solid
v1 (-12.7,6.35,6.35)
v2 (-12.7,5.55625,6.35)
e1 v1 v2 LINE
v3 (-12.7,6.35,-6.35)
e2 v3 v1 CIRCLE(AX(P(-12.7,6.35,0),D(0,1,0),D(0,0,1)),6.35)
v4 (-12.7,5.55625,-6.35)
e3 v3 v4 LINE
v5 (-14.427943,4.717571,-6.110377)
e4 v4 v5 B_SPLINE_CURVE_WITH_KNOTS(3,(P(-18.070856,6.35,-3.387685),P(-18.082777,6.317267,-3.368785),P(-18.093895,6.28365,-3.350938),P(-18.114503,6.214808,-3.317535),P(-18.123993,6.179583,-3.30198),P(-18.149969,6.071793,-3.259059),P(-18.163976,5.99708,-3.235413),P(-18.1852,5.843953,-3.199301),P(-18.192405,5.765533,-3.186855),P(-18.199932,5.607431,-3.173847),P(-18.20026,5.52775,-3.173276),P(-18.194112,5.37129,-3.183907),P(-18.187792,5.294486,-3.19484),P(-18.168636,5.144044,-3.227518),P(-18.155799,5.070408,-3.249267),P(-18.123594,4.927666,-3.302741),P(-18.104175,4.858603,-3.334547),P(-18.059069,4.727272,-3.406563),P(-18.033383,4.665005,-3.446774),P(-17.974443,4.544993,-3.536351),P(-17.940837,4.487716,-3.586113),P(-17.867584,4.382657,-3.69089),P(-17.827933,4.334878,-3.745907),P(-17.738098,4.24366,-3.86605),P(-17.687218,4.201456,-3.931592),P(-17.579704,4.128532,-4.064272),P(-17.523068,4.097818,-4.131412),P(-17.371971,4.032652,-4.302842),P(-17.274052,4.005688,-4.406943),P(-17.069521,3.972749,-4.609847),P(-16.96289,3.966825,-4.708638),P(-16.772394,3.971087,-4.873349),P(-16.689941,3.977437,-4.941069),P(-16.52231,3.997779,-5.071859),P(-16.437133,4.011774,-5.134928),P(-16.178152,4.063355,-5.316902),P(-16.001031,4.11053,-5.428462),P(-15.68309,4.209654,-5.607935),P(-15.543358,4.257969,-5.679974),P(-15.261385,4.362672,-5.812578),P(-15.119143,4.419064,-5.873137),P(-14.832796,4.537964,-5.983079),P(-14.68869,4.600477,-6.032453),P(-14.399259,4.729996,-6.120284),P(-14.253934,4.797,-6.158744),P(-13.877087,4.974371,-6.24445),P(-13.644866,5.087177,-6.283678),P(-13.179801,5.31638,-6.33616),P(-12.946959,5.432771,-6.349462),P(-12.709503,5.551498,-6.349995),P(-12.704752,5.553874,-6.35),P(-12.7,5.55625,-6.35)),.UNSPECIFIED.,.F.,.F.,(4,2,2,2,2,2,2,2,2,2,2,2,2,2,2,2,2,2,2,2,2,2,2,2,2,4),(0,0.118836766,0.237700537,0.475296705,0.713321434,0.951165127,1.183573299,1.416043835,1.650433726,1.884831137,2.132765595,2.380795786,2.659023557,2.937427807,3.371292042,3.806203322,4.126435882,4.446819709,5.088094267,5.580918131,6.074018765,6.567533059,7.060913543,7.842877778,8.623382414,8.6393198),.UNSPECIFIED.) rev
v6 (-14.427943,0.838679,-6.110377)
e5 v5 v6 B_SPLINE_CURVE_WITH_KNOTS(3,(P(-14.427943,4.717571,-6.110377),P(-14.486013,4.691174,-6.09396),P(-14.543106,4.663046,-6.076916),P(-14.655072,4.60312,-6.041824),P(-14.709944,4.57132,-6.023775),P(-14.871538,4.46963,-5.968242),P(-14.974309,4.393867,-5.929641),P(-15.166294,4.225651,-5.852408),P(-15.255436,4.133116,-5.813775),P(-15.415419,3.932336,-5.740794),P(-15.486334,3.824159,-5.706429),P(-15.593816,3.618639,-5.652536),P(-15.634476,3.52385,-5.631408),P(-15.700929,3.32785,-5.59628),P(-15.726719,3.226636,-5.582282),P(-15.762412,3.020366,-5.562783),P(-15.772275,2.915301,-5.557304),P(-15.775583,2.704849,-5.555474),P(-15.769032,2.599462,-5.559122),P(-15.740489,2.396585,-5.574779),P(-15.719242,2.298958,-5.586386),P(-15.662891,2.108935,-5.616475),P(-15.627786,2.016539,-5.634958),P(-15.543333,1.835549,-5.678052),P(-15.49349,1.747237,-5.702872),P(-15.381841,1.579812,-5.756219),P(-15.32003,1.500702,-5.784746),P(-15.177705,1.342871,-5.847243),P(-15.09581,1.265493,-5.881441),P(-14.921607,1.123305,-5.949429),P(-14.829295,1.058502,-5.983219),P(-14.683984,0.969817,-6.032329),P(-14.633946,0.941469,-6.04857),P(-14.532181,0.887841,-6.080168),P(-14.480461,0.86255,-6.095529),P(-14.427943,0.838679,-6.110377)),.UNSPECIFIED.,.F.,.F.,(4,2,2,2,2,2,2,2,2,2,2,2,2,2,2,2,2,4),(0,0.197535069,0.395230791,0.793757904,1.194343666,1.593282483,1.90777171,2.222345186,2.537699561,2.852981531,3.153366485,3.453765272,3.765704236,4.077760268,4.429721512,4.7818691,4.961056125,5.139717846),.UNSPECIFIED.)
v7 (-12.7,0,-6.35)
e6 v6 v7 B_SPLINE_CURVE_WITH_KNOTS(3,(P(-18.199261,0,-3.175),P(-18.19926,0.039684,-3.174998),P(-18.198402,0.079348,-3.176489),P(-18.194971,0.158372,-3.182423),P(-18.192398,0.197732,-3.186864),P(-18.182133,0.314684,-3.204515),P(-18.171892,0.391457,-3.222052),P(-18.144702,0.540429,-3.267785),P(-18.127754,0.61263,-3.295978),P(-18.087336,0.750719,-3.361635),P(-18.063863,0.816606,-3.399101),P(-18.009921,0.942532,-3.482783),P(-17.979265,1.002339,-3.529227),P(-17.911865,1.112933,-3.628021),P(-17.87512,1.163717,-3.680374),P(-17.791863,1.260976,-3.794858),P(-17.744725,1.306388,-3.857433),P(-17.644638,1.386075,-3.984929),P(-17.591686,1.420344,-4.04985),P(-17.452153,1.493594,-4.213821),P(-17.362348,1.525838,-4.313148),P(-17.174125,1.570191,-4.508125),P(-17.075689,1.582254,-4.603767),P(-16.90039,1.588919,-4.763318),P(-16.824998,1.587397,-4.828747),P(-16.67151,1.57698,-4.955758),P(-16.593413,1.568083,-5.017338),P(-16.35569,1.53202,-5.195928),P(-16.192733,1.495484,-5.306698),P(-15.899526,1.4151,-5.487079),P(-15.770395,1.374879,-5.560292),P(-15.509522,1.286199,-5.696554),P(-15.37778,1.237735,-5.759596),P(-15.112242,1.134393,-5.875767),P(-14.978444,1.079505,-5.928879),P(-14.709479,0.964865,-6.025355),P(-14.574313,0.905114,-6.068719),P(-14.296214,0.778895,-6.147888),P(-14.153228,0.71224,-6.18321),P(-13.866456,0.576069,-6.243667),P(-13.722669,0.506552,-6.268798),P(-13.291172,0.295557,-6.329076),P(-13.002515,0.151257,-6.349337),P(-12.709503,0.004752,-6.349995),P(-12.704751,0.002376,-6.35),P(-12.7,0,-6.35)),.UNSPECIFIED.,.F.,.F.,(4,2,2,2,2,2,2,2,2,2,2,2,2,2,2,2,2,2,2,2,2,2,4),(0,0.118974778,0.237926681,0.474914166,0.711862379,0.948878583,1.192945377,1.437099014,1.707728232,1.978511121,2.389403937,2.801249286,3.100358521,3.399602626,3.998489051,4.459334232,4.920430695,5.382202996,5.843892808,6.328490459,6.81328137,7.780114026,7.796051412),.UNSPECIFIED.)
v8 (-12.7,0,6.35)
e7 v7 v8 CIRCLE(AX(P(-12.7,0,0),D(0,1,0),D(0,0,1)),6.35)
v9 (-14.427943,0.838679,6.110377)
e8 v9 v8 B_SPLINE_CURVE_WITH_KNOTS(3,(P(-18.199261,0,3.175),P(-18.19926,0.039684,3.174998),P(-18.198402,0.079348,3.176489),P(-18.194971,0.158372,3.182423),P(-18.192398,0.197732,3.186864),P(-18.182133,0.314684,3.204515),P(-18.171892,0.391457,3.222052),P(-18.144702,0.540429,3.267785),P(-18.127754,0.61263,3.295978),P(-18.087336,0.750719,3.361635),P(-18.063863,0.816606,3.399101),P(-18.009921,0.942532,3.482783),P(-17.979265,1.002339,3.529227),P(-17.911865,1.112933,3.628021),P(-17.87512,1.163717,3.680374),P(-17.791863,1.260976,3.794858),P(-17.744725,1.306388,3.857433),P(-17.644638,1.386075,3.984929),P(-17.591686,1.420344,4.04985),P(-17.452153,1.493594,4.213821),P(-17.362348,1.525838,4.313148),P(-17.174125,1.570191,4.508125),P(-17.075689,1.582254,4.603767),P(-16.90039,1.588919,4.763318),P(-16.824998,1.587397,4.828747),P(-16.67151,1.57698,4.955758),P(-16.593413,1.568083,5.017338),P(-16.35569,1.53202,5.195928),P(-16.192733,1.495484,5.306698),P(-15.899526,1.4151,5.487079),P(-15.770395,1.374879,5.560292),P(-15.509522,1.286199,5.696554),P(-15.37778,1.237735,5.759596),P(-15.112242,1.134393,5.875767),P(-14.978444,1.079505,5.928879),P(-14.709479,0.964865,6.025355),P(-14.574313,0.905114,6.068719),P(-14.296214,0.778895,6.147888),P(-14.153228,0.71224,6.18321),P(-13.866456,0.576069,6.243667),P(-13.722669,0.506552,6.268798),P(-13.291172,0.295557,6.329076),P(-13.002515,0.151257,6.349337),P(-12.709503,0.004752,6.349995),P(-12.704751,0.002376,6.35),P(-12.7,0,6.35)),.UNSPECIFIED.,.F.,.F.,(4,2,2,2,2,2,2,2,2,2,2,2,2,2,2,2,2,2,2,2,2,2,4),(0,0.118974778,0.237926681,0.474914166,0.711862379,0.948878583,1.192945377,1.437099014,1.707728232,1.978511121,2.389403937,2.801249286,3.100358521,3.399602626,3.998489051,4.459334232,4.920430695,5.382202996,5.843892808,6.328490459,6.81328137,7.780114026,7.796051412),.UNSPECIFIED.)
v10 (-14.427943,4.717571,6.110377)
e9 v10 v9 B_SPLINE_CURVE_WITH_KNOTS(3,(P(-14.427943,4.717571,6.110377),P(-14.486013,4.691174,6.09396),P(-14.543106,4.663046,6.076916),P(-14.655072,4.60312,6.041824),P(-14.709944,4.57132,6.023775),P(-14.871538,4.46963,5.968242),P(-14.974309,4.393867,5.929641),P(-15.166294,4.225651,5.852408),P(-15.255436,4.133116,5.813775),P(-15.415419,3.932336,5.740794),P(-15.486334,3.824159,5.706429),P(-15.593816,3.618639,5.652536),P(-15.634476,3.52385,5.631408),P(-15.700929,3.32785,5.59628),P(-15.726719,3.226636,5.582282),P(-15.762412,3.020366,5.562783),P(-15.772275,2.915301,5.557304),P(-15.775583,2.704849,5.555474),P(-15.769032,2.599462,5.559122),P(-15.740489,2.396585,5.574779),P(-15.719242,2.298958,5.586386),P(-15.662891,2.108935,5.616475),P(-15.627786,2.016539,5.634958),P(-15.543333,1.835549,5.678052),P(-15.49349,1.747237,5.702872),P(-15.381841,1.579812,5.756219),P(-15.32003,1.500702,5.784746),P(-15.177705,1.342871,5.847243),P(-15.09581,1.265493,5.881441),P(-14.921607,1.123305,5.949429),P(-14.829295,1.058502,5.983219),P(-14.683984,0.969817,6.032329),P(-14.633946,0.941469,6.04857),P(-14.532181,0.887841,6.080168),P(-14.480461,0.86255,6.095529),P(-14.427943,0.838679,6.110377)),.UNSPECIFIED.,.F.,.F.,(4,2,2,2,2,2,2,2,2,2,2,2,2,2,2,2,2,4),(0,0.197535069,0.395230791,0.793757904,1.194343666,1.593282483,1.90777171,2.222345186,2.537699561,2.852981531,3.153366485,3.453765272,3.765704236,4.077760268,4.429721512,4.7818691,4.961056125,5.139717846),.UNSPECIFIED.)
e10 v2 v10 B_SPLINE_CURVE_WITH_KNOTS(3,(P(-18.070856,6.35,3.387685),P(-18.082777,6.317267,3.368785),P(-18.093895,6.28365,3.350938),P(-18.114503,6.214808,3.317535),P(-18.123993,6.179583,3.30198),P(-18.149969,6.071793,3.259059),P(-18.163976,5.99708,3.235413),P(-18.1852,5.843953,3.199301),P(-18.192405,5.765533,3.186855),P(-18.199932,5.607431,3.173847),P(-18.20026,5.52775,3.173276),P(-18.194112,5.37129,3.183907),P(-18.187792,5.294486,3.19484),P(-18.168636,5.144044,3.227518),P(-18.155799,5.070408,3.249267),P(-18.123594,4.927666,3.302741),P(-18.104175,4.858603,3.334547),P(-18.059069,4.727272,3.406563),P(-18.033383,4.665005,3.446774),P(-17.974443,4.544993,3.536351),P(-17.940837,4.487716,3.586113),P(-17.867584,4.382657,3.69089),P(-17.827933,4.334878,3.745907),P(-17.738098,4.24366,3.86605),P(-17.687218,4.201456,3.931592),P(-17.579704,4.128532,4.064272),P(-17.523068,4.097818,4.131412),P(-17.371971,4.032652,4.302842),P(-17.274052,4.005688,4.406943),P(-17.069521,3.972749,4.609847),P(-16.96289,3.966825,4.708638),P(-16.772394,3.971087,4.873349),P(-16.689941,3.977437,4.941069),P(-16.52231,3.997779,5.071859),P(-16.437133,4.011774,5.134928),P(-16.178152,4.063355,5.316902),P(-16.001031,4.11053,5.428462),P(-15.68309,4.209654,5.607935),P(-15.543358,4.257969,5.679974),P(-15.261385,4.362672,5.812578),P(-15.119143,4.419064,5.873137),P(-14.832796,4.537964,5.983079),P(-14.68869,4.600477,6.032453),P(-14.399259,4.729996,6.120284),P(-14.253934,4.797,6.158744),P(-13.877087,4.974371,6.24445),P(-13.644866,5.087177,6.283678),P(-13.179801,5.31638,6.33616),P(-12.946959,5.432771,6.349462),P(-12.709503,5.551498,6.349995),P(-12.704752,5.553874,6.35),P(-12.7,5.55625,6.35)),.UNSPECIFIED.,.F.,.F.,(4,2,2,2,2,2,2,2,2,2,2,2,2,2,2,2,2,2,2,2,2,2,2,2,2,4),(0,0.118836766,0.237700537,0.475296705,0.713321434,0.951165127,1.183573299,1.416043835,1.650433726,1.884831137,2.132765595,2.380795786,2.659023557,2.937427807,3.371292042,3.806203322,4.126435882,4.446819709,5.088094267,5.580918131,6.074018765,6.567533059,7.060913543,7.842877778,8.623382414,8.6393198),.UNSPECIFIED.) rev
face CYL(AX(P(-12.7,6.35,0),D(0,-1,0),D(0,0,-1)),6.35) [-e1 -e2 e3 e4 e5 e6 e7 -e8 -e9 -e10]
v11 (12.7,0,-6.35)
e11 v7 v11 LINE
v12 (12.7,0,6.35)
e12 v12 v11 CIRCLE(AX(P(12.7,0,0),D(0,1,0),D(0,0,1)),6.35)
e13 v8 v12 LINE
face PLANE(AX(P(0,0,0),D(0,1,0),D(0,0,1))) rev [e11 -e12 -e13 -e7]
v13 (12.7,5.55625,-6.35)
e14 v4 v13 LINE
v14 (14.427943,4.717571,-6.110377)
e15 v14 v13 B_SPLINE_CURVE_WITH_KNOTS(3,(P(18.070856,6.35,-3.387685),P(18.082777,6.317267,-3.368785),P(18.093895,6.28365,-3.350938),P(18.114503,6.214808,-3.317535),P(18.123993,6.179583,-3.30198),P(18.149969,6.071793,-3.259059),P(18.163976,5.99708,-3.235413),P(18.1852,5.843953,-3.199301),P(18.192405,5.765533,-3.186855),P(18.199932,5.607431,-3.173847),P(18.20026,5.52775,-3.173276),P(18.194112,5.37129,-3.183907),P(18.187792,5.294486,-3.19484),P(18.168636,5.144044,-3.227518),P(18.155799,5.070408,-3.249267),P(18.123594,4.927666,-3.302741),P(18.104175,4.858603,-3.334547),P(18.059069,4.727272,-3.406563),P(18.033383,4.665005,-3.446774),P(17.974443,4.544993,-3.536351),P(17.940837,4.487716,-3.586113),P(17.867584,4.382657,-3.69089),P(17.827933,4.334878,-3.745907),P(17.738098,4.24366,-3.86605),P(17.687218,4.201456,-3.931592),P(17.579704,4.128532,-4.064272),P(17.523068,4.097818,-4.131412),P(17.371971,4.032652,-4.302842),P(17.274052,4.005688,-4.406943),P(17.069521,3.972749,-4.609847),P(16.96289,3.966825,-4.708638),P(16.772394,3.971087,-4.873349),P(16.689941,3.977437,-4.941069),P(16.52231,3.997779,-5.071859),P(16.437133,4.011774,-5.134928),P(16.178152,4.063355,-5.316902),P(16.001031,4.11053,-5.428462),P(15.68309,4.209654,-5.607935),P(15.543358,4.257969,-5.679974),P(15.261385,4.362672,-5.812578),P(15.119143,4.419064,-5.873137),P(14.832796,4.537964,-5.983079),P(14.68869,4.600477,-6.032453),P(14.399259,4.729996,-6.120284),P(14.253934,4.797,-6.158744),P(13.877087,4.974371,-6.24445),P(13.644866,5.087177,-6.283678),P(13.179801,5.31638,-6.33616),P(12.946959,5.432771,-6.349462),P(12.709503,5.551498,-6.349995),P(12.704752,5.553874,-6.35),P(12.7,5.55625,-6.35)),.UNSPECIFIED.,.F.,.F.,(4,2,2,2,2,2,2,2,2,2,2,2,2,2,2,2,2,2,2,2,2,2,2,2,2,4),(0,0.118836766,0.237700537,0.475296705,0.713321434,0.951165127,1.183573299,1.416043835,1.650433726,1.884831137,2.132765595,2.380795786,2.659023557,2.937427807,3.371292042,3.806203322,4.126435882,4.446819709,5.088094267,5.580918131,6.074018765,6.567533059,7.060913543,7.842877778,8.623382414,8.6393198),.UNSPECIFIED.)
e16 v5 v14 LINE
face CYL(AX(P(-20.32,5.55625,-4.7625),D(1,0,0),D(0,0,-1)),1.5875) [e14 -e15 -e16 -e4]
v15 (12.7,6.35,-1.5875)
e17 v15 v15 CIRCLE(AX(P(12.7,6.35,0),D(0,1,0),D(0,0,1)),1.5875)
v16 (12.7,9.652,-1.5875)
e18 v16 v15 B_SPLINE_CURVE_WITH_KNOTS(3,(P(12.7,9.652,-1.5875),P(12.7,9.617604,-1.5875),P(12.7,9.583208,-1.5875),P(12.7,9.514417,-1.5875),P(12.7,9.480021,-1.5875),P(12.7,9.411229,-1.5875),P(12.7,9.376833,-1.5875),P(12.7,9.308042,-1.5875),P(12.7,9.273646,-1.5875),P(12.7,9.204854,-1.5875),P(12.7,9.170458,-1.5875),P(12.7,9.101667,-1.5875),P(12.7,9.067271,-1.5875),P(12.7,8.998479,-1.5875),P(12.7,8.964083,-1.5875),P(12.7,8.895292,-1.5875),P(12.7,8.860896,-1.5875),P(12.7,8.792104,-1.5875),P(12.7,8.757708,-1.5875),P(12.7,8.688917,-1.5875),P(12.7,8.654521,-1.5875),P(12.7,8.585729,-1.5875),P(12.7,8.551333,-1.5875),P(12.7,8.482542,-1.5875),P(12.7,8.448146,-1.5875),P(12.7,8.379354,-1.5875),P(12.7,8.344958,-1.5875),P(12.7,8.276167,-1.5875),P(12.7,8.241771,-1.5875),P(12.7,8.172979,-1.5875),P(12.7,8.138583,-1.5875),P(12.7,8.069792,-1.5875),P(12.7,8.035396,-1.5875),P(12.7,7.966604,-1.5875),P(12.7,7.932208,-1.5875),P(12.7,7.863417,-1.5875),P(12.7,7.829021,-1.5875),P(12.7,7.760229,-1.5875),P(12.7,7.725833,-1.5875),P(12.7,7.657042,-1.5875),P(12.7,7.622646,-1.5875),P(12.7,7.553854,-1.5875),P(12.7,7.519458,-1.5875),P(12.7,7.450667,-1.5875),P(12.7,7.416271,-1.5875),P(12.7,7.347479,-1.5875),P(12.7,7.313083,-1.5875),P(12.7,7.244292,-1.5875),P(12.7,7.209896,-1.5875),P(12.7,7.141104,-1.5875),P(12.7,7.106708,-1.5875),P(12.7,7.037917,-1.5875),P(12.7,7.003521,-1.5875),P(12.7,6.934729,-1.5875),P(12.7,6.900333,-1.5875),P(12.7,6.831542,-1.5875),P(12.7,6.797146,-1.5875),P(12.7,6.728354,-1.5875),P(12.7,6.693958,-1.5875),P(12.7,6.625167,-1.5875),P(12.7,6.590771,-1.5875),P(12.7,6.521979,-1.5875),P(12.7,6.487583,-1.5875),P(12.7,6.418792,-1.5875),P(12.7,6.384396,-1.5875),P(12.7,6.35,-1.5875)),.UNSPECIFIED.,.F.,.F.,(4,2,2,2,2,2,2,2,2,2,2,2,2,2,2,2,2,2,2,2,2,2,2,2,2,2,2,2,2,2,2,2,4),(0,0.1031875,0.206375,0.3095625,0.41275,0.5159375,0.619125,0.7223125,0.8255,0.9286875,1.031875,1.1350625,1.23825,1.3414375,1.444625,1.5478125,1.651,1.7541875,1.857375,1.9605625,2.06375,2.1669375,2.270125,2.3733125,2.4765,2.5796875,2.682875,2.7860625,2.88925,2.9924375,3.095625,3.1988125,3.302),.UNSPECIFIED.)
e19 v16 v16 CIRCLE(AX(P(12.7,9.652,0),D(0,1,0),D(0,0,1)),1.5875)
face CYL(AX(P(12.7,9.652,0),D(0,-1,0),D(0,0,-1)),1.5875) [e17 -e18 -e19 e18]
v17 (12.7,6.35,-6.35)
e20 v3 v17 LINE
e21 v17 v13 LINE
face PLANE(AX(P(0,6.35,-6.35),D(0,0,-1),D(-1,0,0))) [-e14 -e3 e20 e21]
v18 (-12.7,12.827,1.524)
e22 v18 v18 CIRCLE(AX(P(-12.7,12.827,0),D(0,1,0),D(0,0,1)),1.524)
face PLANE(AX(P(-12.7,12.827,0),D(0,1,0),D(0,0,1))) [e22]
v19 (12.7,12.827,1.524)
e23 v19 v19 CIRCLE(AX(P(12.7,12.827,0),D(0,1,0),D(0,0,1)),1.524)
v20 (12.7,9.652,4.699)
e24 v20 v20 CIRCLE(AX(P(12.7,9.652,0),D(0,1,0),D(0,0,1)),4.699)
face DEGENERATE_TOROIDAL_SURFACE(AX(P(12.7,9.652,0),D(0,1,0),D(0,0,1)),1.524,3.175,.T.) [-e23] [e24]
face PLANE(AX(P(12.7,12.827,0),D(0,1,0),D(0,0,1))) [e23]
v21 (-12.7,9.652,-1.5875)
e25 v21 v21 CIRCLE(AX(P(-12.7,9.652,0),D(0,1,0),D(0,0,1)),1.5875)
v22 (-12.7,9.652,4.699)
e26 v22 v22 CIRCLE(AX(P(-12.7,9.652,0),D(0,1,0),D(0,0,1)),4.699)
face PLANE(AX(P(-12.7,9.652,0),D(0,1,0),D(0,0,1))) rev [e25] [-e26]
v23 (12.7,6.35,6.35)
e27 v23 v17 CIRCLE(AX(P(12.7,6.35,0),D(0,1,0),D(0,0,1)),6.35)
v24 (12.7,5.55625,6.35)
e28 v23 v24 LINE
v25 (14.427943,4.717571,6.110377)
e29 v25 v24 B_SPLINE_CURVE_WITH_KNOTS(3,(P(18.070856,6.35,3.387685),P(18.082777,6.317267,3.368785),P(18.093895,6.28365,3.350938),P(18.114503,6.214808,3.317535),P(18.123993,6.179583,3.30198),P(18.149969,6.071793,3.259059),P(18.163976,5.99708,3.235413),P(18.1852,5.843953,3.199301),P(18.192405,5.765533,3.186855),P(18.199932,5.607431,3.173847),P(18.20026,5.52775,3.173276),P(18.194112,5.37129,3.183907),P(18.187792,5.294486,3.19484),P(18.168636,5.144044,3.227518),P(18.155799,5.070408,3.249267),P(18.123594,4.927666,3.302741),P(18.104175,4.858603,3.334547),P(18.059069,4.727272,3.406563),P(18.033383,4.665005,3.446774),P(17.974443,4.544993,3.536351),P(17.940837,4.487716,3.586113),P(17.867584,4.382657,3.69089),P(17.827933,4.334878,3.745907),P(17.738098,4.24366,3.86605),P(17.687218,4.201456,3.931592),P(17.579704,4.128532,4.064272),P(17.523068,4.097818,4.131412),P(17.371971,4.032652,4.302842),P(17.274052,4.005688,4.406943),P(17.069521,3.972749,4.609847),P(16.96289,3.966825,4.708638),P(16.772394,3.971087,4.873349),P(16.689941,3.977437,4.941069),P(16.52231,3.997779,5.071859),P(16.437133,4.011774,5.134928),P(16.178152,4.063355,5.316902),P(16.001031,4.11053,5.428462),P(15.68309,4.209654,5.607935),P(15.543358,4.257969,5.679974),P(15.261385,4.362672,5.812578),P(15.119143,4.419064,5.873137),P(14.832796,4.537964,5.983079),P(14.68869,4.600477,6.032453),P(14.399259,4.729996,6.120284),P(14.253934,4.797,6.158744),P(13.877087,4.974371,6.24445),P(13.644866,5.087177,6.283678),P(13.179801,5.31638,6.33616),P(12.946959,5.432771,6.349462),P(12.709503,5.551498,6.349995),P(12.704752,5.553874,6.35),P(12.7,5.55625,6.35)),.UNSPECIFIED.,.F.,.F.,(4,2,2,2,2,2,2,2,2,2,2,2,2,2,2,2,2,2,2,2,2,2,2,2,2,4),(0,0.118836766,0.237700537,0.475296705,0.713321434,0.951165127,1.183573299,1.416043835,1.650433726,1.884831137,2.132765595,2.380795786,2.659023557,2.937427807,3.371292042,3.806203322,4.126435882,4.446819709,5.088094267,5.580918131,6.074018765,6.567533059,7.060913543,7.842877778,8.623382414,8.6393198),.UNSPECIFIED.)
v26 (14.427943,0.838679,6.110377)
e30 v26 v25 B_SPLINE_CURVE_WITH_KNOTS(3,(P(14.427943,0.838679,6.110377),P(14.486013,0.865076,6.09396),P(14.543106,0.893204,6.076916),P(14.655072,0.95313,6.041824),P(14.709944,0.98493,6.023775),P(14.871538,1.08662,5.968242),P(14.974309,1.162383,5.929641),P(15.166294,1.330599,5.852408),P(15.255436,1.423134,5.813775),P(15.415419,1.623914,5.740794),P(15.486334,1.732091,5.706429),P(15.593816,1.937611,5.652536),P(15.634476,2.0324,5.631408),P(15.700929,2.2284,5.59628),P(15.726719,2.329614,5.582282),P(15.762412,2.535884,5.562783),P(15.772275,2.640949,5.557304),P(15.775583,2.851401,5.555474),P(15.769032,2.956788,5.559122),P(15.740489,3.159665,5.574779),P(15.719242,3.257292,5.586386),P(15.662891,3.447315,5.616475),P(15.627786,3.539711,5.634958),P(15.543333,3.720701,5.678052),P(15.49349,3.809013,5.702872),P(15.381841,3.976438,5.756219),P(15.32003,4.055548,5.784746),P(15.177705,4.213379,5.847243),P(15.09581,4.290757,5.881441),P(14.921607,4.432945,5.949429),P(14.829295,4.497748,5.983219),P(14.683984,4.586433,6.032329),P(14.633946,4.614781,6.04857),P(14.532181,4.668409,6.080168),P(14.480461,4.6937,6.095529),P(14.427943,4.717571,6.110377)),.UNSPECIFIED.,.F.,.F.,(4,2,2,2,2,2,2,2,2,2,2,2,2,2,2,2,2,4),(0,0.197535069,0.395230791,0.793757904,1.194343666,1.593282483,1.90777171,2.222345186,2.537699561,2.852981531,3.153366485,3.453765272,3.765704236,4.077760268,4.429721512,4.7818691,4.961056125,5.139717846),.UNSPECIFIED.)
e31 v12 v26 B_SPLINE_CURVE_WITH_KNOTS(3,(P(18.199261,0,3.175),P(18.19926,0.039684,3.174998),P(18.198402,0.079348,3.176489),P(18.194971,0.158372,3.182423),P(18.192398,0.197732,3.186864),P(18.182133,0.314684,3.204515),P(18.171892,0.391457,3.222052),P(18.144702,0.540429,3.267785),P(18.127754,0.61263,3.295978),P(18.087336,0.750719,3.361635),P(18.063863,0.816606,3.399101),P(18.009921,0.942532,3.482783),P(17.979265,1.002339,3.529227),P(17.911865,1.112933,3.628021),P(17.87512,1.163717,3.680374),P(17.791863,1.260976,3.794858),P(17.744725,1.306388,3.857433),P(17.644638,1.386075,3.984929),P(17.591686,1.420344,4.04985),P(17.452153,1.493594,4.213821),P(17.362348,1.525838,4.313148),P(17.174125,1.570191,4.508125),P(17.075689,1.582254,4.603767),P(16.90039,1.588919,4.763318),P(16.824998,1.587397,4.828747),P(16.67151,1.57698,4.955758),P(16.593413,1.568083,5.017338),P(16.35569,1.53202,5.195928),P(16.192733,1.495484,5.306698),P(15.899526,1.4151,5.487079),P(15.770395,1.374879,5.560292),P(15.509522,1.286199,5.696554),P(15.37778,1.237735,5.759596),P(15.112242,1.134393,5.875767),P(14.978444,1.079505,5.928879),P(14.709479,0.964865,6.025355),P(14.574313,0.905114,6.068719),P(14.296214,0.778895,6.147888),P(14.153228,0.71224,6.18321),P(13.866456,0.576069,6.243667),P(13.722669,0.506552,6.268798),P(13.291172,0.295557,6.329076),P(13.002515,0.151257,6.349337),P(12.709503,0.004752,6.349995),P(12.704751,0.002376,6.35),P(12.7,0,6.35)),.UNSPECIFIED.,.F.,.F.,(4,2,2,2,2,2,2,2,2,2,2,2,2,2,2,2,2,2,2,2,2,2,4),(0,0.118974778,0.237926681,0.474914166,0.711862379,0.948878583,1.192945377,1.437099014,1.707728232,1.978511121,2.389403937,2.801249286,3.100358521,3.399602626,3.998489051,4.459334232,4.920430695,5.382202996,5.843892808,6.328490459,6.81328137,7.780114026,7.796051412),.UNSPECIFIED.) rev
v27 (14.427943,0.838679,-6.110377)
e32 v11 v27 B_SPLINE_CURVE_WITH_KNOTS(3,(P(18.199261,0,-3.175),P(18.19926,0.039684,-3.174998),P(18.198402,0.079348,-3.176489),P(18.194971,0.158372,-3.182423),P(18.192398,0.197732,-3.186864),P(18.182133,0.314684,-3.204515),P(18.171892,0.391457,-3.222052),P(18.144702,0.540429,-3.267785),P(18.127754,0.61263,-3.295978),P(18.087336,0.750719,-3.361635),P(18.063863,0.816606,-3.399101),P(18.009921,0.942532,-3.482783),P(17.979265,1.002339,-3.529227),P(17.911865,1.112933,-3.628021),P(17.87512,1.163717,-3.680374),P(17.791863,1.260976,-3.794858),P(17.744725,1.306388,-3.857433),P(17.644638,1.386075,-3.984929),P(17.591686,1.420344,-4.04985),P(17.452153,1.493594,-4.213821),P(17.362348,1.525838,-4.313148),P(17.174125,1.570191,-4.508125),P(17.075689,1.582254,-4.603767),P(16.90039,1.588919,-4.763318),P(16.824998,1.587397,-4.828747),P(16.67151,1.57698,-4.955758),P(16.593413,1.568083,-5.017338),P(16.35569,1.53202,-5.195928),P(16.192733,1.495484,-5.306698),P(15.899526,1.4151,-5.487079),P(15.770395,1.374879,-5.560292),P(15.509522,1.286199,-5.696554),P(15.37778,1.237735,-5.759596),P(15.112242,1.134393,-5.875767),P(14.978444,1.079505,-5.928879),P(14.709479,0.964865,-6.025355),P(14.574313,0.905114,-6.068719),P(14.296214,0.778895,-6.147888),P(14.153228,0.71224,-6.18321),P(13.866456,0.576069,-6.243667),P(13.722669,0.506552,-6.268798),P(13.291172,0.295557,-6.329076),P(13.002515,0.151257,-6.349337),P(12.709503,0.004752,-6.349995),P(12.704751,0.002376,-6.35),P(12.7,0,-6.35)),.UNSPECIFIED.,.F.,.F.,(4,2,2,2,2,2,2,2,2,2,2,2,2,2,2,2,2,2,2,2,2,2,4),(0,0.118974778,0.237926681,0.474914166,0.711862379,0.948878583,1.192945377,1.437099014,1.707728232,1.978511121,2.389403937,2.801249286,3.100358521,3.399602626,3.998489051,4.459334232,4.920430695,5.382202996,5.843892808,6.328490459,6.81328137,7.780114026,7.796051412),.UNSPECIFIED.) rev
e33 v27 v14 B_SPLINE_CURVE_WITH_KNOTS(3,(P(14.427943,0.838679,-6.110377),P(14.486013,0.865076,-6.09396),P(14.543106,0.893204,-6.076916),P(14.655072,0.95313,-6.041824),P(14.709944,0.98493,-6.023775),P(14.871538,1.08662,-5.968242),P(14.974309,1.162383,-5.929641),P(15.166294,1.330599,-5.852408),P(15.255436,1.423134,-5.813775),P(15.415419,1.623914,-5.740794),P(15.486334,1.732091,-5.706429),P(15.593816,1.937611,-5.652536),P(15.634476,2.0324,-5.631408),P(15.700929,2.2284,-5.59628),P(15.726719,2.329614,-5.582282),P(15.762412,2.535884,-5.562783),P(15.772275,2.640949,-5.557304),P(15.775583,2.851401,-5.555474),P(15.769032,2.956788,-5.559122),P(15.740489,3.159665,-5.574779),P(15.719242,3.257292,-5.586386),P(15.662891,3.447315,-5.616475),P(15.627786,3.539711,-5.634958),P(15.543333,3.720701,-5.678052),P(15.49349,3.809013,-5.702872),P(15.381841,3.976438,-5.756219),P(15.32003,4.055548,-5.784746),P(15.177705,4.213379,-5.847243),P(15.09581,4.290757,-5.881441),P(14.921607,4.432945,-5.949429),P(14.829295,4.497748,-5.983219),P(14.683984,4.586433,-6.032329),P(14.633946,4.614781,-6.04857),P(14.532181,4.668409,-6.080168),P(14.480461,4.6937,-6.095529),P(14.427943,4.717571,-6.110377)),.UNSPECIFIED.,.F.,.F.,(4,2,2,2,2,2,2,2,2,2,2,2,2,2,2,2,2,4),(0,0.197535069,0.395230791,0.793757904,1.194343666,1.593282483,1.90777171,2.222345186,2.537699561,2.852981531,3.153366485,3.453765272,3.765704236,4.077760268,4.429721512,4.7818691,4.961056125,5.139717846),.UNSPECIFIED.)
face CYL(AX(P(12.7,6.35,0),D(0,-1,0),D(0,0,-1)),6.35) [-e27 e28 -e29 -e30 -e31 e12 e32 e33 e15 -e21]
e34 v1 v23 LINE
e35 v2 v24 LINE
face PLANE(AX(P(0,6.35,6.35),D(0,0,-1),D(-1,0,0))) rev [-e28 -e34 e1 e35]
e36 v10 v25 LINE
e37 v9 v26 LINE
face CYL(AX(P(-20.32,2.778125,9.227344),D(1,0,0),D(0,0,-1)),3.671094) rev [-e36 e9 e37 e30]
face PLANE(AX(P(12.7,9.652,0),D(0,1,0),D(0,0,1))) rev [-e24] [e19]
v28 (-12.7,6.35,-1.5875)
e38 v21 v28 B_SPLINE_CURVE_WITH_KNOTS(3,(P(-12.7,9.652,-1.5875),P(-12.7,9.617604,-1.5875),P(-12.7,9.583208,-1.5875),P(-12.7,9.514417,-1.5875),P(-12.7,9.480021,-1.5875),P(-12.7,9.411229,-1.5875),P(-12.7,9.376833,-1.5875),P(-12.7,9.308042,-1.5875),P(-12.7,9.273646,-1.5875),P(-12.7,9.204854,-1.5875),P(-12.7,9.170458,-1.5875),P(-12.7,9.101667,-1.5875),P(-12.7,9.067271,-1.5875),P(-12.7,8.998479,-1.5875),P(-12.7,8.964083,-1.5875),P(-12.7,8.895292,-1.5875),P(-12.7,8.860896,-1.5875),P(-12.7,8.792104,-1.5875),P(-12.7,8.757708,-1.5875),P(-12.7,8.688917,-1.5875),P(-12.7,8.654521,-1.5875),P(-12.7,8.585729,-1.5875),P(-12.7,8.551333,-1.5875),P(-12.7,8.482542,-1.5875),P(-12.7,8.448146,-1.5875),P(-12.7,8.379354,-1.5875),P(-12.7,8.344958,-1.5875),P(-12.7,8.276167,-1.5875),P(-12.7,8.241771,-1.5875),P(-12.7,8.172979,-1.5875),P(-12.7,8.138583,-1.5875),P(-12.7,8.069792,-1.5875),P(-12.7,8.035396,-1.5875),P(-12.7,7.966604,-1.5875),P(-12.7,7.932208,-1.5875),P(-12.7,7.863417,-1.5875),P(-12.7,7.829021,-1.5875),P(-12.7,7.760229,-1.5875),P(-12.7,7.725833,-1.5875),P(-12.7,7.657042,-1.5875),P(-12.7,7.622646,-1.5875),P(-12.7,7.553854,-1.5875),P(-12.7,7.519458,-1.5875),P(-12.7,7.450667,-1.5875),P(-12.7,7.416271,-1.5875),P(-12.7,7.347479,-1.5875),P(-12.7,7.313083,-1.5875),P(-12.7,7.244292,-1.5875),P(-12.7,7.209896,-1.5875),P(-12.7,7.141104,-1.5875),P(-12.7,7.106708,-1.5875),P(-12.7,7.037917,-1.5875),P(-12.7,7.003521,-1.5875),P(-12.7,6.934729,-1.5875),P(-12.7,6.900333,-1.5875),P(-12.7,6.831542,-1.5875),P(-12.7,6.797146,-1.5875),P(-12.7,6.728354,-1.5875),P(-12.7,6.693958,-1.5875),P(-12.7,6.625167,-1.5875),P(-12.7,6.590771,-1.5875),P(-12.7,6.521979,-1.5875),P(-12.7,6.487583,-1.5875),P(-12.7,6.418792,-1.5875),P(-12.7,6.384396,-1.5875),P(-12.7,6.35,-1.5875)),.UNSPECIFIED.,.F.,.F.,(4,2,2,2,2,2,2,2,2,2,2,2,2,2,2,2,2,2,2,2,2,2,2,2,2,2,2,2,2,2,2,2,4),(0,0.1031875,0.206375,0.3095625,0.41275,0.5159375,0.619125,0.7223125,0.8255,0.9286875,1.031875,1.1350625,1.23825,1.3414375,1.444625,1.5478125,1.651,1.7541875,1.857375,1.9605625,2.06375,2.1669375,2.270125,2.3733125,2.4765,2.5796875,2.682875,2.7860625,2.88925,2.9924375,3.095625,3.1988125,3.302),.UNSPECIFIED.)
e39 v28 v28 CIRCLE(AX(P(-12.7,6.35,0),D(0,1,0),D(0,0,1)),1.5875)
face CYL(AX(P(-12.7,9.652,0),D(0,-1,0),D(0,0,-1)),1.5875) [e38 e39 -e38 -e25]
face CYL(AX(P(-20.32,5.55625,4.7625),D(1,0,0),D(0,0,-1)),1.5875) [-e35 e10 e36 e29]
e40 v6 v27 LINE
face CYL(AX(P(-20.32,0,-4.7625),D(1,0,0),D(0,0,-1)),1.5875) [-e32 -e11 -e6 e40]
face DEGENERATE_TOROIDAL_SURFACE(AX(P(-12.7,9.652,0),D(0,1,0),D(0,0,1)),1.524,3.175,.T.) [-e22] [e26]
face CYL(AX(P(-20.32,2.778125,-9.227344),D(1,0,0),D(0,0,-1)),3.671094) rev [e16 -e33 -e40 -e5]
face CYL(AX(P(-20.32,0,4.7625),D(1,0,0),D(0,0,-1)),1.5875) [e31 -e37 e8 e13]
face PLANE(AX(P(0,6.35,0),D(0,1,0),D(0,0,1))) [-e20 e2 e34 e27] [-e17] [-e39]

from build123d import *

# Parameters (mm, degrees)
SKETCH1_R           = 1.5875
BOSS_EXTRUDE1_DEPTH = 6.35
BOSS_EXTRUDE2_START = 6.35
SKETCH1_4_R         = 1.5875
BOSS_EXTRUDE2_DEPTH = 3.302
SKETCH2_R           = 4.699
BOSS_EXTRUDE3_DEPTH = 3.175
CUT_EXTRUDE1_DEPTH  = 20.32
FILLET1_R           = 3.175


with BuildPart() as part:
    # Sketch1 → Boss-Extrude1 (new body)
    # profile 1 of 3: a face of its own
    with BuildSketch(Plane(origin=(0, 0, 0), x_dir=(1, 0, 0), z_dir=(0, 1, 0))):
        with BuildLine():
            Line((-12.7, -6.35), (12.7, -6.35))
            ThreePointArc((12.7, -6.35), (19.05, 0), (12.7, 6.35))
            Line((12.7, 6.35), (-12.7, 6.35))
            ThreePointArc((-12.7, 6.35), (-19.05, 0), (-12.7, -6.35))
        make_face()
        with Locations((-12.7, 0)):
            Circle(SKETCH1_R, mode=Mode.SUBTRACT)
        with Locations((12.7, 0)):
            Circle(SKETCH1_R, mode=Mode.SUBTRACT)
    # profile 2 of 3: a face of its own
    with BuildSketch(Plane(origin=(0, 0, 0), x_dir=(1, 0, 0), z_dir=(0, 1, 0))):
        with Locations((-12.7, 0)):
            Circle(SKETCH1_R)
    # profile 3 of 3: a face of its own
    with BuildSketch(Plane(origin=(0, 0, 0), x_dir=(1, 0, 0), z_dir=(0, 1, 0))):
        with Locations((12.7, 0)):
            Circle(SKETCH1_R)
    extrude(amount=BOSS_EXTRUDE1_DEPTH)

    # Sketch1<4> → Boss-Extrude2 (add)
    with BuildSketch(Plane(origin=(0, 0, 0), x_dir=(1, 0, 0), z_dir=(0, 1, 0)).offset(BOSS_EXTRUDE2_START)):
        with Locations(Location((-12.7, 0, 0), (0, 0, 90))):
            Circle(SKETCH1_4_R)
        with Locations(Location((12.7, 0, 0), (0, 0, 90))):
            Circle(SKETCH1_4_R)
    extrude(amount=BOSS_EXTRUDE2_DEPTH)

    # Sketch2 → Boss-Extrude3 (add)
    with BuildSketch(Plane(origin=(0, 9.652, 0), x_dir=(1, 0, 0), z_dir=(0, 1, 0))):
        with Locations(Location((-12.7, 0, 0), (0, 0, 270))):
            Circle(SKETCH2_R)
        with Locations(Location((12.7, 0, 0), (0, 0, 270))):
            Circle(SKETCH2_R)
    extrude(amount=BOSS_EXTRUDE3_DEPTH)

    # Sketch3 → Cut-Extrude1 (cut, symmetric)
    with BuildSketch(Plane(origin=(0, 0, 0), x_dir=(0, 0, -1), z_dir=(1, 0, 0))):
        with BuildLine():
            Line((6.35, 0), (6.35, 5.55625))
            ThreePointArc((6.35, 5.55625), (6.288919267, 5.120130209), (6.110377358, 4.717570755))
            ThreePointArc((6.110377358, 4.717570755), (5.697499195, 3.786652016), (5.55625, 2.778125))
            ThreePointArc((5.55625, 2.778125), (5.697499195, 1.769597984), (6.110377358, 0.838679245))
            ThreePointArc((6.110377358, 0.838679245), (6.288919267, 0.436119791), (6.35, 0))
        make_face()
        with BuildLine():
            ThreePointArc((-6.110377358, 4.717570755), (-6.288919267, 5.120130209), (-6.35, 5.55625))
            Line((-6.35, 5.55625), (-6.35, 0))
            ThreePointArc((-6.35, 0), (-6.288919267, 0.436119791), (-6.110377358, 0.838679245))
            ThreePointArc((-6.110377358, 0.838679245), (-5.697499195, 1.769597984), (-5.55625, 2.778125))
            ThreePointArc((-5.55625, 2.778125), (-5.697499195, 3.786652016), (-6.110377358, 4.717570755))
        make_face()
    extrude(amount=CUT_EXTRUDE1_DEPTH, both=True, mode=Mode.SUBTRACT)

    # Fillet1
    fillet1_edges = [part.edges().sort_by_distance(p)[0] for p in [
        (-12.7, 12.827, -4.699),
        (12.7, 12.827, -4.699),
    ]]
    fillet(fillet1_edges, radius=FILLET1_R - 0.0001)  # a hair under: the kernel refuses the full size


solid = part.part
